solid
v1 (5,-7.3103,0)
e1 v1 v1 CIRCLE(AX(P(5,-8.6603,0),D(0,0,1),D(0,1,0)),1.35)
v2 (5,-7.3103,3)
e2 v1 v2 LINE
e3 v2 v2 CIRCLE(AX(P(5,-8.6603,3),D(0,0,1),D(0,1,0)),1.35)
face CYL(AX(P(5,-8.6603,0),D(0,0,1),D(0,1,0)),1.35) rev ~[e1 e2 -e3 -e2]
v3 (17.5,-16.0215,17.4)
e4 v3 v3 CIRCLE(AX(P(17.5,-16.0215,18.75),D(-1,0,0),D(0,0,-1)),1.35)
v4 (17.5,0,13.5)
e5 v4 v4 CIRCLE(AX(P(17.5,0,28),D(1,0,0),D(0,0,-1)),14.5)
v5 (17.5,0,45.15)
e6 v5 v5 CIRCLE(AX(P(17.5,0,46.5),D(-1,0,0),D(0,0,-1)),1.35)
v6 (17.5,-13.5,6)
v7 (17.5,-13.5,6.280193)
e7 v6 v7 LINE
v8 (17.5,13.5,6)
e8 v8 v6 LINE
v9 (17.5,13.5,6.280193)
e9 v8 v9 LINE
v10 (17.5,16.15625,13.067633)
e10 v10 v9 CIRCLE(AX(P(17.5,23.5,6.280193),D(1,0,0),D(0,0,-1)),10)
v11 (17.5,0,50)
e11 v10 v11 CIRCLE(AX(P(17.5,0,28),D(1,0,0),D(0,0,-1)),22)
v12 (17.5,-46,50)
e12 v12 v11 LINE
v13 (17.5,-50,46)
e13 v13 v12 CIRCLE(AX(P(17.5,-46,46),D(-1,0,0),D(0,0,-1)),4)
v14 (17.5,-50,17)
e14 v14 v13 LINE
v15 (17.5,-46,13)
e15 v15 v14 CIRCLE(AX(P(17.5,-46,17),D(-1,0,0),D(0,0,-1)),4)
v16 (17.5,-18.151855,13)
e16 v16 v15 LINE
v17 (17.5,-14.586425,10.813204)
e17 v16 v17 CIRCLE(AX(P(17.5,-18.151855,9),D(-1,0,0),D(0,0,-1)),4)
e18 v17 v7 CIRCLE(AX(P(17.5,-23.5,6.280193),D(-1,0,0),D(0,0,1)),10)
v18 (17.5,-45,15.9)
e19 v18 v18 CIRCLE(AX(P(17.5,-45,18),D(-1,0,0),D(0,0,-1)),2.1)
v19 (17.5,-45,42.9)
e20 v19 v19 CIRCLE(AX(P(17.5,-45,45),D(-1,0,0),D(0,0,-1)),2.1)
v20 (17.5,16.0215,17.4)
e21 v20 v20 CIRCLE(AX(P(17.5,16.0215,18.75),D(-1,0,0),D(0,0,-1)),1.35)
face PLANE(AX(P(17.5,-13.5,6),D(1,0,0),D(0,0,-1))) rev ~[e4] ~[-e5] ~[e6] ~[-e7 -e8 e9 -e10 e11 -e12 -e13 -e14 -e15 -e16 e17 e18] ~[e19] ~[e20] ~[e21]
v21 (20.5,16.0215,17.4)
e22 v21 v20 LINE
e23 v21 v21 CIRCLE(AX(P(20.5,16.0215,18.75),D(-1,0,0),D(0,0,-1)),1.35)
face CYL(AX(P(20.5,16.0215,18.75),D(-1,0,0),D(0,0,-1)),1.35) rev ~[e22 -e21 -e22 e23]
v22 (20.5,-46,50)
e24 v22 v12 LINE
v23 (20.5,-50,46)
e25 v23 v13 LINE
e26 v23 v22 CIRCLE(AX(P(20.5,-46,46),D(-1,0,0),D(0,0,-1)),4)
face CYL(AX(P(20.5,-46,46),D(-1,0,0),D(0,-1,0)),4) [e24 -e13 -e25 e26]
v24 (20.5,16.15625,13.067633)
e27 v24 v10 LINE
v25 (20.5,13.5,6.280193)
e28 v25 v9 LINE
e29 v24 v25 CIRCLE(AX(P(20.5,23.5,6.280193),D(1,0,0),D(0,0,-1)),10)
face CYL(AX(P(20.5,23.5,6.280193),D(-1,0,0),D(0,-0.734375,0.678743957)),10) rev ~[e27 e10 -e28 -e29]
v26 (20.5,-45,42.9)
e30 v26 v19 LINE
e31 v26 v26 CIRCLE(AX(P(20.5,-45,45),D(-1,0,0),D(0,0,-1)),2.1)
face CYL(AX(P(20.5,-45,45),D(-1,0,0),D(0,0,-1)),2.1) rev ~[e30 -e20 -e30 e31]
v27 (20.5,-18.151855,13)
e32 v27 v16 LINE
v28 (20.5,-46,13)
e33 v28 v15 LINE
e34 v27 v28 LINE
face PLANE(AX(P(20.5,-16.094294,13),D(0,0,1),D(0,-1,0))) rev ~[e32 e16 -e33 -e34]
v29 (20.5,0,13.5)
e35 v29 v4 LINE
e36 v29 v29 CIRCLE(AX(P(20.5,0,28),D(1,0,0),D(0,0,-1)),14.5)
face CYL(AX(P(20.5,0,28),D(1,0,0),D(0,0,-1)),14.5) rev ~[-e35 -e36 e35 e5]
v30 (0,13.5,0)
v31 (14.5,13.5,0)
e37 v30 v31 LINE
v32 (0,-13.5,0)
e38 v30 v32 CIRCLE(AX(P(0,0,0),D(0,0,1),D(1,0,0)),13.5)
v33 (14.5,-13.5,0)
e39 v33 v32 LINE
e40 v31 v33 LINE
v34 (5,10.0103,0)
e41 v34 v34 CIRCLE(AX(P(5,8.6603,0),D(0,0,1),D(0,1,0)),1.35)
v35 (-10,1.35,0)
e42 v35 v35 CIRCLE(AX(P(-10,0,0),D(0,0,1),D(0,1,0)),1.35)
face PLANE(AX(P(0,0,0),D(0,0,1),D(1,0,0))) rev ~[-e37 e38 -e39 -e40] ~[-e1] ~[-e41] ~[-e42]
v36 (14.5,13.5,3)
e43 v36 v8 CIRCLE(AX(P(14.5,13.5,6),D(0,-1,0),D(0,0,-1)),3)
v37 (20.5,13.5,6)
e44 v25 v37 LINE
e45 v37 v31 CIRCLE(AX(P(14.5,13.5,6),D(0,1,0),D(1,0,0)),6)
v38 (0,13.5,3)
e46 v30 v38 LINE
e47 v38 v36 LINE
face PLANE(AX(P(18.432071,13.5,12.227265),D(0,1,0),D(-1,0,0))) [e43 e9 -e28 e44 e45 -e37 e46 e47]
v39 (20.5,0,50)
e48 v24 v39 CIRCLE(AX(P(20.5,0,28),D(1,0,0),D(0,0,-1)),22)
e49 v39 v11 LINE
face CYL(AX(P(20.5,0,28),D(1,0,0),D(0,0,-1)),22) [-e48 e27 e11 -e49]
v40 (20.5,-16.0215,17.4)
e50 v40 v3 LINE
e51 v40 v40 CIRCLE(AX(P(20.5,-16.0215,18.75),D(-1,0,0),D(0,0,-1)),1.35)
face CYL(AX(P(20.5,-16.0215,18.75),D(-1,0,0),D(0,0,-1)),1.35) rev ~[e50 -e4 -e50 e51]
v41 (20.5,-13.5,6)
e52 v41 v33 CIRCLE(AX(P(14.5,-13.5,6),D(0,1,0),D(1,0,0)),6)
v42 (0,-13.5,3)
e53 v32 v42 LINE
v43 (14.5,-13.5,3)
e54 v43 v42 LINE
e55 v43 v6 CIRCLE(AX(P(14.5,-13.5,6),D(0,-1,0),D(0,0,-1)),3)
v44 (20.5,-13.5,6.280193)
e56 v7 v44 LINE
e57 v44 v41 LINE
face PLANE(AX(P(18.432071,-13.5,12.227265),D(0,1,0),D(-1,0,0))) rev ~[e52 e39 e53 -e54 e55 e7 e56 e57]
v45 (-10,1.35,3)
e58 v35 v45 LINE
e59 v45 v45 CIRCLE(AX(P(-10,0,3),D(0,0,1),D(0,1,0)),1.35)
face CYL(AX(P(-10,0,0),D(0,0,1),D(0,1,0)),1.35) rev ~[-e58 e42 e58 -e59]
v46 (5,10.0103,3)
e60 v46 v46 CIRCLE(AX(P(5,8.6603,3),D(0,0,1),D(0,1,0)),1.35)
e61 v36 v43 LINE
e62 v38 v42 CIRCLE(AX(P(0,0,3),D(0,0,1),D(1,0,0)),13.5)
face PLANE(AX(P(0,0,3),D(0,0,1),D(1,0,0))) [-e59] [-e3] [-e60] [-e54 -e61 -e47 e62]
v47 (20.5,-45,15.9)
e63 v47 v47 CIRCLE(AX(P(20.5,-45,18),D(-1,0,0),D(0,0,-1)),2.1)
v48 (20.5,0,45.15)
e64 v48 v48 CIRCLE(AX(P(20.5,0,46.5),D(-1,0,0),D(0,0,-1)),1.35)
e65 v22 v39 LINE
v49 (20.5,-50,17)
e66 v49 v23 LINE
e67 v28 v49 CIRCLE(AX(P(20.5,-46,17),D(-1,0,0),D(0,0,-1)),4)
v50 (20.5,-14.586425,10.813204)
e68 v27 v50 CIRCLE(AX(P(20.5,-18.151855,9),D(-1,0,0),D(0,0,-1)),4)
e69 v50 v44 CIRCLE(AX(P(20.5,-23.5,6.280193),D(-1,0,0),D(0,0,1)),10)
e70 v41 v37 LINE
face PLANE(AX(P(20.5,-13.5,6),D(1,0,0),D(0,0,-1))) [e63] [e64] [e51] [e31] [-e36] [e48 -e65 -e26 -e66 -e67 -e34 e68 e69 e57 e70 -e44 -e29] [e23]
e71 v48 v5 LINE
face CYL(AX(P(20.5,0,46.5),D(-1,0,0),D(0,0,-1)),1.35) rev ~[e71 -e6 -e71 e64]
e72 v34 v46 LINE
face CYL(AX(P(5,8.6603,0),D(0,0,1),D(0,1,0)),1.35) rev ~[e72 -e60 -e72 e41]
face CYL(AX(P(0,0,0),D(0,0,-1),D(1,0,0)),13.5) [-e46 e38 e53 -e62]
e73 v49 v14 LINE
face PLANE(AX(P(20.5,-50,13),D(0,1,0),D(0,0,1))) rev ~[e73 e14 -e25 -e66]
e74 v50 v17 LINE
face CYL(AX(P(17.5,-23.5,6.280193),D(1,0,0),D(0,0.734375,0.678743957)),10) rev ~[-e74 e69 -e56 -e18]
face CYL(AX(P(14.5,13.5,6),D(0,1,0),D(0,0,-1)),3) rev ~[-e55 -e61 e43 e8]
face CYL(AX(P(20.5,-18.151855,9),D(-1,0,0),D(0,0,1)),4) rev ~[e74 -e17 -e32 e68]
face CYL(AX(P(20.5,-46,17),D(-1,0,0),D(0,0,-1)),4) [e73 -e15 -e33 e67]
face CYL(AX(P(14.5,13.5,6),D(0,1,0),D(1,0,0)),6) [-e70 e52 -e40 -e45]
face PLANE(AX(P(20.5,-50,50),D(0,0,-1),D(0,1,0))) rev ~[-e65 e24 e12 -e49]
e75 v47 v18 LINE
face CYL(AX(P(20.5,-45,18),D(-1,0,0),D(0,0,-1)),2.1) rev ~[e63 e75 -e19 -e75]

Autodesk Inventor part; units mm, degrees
ref_plane "YZ Plane" through (0, 0, 0) normal (1, 0, 0) x (0, 1, 0)
ref_plane "XZ Plane" through (0, 0, 0) normal (0, 1, 0) x (-1, 0, 0)
ref_plane "XY Plane" through (0, 0, 0) normal (0, 0, 1) x (1, 0, 0)
sketch "スケッチ1" plane through (0, 0, 0) normal (0, 0, 1) x (1, 0, 0)
  circle A0 centre (0, 0) radius 13.5
  line L0 (0, 13.5) -> (14.5, 13.5)
  line L1 (14.5, 13.5) -> (14.5, -13.5)
  line L2 (14.5, -13.5) -> (0, -13.5)
  line L3 (0, -13.5) -> (0, 13.5)
  line L4 (0, 0) -> (14.5, 0) construction
  point P0 (0, 13.5)
  point P1 (0, -13.5)
  point P2 (0, -13.5)
  dimension "d0" = 27
  dimension "d1" = 27
  dimension "d2" = 14.5
extrude "プレート1" add sketch "スケッチ1" along normal blind 3
sketch "スケッチ2" plane through (17.5, 13.5, 6) normal (1, 0, 0) x (0, 1, 0)
  line L0 (-27, 0) -> (0, 0)
  line L1 (0, 0) -> (0, 19)
  line L2 (0, 19) -> (-27, 19)
  line L3 (-27, 19) -> (-27, 0)
edge flange "フランジ1" height 25 angle 90 thickness 3 bend radius 3 thickness toward (1, 0, 0) relief tear relief width 3 relief depth 1.5 edges at (14.5, 0, 3) wall of the first edge with corners at (17.5, -13.5, 6) (17.5, 13.5, 6) (17.5, 13.5, 25) (17.5, -13.5, 25)
bend "曲げ1"
corner "コーナー1"
sketch "スケッチ3" plane through (0, 0, 0) normal (0, 0, -1) x (-1, 0, 0)
  point P0 (0, 0)
  point P1 (10, 0)
  point P2 (-5, 8.6603)
  point P3 (-5, -8.6603)
  dimension "d14" = 10
  dimension "d17" = 360
hole "穴1" at (-10, 0, 0) at (5, 8.6603, 0) at (5, -8.6603, 0) direction (0, 0, 1) diameter 2.7 depth 3
sketch "スケッチ4" plane through (20.5, -13.5, 25) normal (1, 0, 0) x (0, 0, -1)
  circle A0 centre (-3, 13.5) radius 22
  line L0 (25, 27) -> (25, 0) projected
  line L1 (0, 27) -> (19, 27) projected
  point P0 (25, 13.5)
  dimension "d26" = 44
  dimension "d29" = 28
  dimension "d62" = 13.5
extrude "押し出し1" add sketch "スケッチ4" against normal up to surface (3 mm away)
sketch "スケッチ5" plane through (20.5, -13.5, 6) normal (1, 0, 0) x (0, 0, -1)
  arc A0 (-4.629, 27) -> (-4.629, 0) centre (-22, 13.5) ccw projected
  circle A1 centre (-22, 13.5) radius 14.5
  point P0 (6, 13.5)
  dimension "d30" = 29
extrude "押し出し2" cut sketch "スケッチ5" against normal up to surface (3 mm away)
sketch "スケッチ6" plane through (20.5, 0, 28) normal (1, 0, 0) x (0, 0, 1)
  point P0 (-28, 0)
sketch "スケッチ7" plane through (20.5, -13.5, 6) normal (1, 0, 0) x (0, 0, -1)
  circle A0 centre (-22, 13.5) radius 14.5 projected
  point P0 (6, 13.5)
  point P1 (-40.5, 13.5)
  point P2 (-12.75, -2.5215)
  point P3 (-12.75, 29.5215)
  dimension "d33" = 18.5
  dimension "d36" = 360
hole "穴2" at (20.5, 0, 46.5) at (20.5, -16.0215, 18.75) at (20.5, 16.0215, 18.75) direction (-1, 0, 0) diameter 2.7 depth 3
fillet "フィレット1" radius 10 2 edges at (19, 13.5, 10.629) (19, -13.5, 10.629)
sketch "スケッチ8" plane through (20.5, -13.5, 6) normal (1, 0, 0) x (0, 0, -1)
  arc A0 (-7.0676, 29.6563) -> (-7.0676, -2.6562) centre (-22, 13.5) ccw projected
  line L0 (-44, 13.5) -> (-7, 13.5)
  line L1 (-7, 13.5) -> (-7, -36.5)
  line L2 (-7, -36.5) -> (-44, -36.5)
  line L3 (-44, -36.5) -> (-44, 13.5)
  arc A1 (-7.0676, 29.6562) -> (-0.2802, 27) centre (-0.2802, 37) ccw projected
  line L4 (0, 0) -> (0, 27) projected
  line L5 (0, 0) -> (-0.2802, 0) projected
  arc A2 (-0.2802, 0) -> (-7.0676, -2.6562) centre (-0.2802, -10) ccw projected
  arc A3 (-7.0676, 29.6562) -> (-7.0676, -2.6562) centre (-22, 13.5) ccw projected
  circle A4 centre (-12.75, 29.5215) radius 1.35 projected
  circle A5 centre (-12.75, -2.5215) radius 1.35 projected
  circle A6 centre (-22, 13.5) radius 14.5 projected
  circle A7 centre (-40.5, 13.5) radius 1.35 projected
  point P0 (6, 13.5)
  point P1 (-11.4, 29.5215)
  point P2 (-11.4, 29.5215)
  point P3 (-11.4, -2.5215)
  point P4 (-11.4, -2.5215)
  point P5 (-7.5, 13.5)
  point P6 (-7.5, 13.5)
  point P7 (-39.15, 13.5)
  point P8 (-39.15, 13.5)
  point P9 (-7, -2.5943)
  point P10 (-7.0676, -2.6562)
  dimension "d46" = 50
  dimension "d47" = 37
extrude "押し出し3" add sketch "スケッチ8" against normal up to surface (3 mm away) contours A0 A2 L1 L2 L3
fillet "フィレット2" radius 4 1 edges at (19, -16.0943, 13)
fillet "フィレット3" radius 4 2 edges at (19, -50, 13) (19, -50, 50)
sketch "スケッチ9" plane through (20.5, -13.5, 6) normal (1, 0, 0) x (0, 0, -1)
  line L0 (-44, 13.5) -> (-44, -32.5) projected
  line L1 (-44, -31.5) -> (-6.9219, -31.5) construction
  line L2 (-40, -36.5) -> (-11, -36.5) projected
  line L3 (-7, -32.5) -> (-7, -4.6519) projected
  point P0 (6, 13.5)
  point P1 (-39, -31.5)
  point P2 (-12, -31.5)
  dimension "d52" = 5
  dimension "d53" = 5
  dimension "d54" = 5
hole "穴3" at (20.5, -45, 45) at (20.5, -45, 18) direction (-1, 0, 0) diameter 4.2 depth 3
equation "\"d24\" = Thickness"
equation "\"d60\" = Thickness"
equation "\"d3\" = Thickness"
equation "\"d4\" = BendReliefWidth"
equation "\"d5\" = BendReliefDepth"
equation "\"d6\" = MinimumRemnant"
equation "\"d7\" = TransitionRadius"
equation "\"d10\" = BendRadius"
equation "\"d11\" = CornerReliefSize"
equation "\"d12\" = GapSize"
equation "\"d13\" = JacobiRadiusSize"
equation "\"BendRadius\" = Thickness"
equation "\"BendReliefWidth\" = Thickness"
equation "\"BendReliefDepth\" = 0.5 * Thickness"
equation "\"CornerReliefSize\" = 4 * Thickness"
equation "\"MinimumRemnant\" = 2 * Thickness"
equation "\"TransitionRadius\" = BendRadius"
equation "\"JacobiRadiusSize\" = BendRadius"
equation "\"GapSize\" = Thickness"
equation "\"Thickness\" = 3"
properties part number "hand_plate" material "アルミニウム 6061"
